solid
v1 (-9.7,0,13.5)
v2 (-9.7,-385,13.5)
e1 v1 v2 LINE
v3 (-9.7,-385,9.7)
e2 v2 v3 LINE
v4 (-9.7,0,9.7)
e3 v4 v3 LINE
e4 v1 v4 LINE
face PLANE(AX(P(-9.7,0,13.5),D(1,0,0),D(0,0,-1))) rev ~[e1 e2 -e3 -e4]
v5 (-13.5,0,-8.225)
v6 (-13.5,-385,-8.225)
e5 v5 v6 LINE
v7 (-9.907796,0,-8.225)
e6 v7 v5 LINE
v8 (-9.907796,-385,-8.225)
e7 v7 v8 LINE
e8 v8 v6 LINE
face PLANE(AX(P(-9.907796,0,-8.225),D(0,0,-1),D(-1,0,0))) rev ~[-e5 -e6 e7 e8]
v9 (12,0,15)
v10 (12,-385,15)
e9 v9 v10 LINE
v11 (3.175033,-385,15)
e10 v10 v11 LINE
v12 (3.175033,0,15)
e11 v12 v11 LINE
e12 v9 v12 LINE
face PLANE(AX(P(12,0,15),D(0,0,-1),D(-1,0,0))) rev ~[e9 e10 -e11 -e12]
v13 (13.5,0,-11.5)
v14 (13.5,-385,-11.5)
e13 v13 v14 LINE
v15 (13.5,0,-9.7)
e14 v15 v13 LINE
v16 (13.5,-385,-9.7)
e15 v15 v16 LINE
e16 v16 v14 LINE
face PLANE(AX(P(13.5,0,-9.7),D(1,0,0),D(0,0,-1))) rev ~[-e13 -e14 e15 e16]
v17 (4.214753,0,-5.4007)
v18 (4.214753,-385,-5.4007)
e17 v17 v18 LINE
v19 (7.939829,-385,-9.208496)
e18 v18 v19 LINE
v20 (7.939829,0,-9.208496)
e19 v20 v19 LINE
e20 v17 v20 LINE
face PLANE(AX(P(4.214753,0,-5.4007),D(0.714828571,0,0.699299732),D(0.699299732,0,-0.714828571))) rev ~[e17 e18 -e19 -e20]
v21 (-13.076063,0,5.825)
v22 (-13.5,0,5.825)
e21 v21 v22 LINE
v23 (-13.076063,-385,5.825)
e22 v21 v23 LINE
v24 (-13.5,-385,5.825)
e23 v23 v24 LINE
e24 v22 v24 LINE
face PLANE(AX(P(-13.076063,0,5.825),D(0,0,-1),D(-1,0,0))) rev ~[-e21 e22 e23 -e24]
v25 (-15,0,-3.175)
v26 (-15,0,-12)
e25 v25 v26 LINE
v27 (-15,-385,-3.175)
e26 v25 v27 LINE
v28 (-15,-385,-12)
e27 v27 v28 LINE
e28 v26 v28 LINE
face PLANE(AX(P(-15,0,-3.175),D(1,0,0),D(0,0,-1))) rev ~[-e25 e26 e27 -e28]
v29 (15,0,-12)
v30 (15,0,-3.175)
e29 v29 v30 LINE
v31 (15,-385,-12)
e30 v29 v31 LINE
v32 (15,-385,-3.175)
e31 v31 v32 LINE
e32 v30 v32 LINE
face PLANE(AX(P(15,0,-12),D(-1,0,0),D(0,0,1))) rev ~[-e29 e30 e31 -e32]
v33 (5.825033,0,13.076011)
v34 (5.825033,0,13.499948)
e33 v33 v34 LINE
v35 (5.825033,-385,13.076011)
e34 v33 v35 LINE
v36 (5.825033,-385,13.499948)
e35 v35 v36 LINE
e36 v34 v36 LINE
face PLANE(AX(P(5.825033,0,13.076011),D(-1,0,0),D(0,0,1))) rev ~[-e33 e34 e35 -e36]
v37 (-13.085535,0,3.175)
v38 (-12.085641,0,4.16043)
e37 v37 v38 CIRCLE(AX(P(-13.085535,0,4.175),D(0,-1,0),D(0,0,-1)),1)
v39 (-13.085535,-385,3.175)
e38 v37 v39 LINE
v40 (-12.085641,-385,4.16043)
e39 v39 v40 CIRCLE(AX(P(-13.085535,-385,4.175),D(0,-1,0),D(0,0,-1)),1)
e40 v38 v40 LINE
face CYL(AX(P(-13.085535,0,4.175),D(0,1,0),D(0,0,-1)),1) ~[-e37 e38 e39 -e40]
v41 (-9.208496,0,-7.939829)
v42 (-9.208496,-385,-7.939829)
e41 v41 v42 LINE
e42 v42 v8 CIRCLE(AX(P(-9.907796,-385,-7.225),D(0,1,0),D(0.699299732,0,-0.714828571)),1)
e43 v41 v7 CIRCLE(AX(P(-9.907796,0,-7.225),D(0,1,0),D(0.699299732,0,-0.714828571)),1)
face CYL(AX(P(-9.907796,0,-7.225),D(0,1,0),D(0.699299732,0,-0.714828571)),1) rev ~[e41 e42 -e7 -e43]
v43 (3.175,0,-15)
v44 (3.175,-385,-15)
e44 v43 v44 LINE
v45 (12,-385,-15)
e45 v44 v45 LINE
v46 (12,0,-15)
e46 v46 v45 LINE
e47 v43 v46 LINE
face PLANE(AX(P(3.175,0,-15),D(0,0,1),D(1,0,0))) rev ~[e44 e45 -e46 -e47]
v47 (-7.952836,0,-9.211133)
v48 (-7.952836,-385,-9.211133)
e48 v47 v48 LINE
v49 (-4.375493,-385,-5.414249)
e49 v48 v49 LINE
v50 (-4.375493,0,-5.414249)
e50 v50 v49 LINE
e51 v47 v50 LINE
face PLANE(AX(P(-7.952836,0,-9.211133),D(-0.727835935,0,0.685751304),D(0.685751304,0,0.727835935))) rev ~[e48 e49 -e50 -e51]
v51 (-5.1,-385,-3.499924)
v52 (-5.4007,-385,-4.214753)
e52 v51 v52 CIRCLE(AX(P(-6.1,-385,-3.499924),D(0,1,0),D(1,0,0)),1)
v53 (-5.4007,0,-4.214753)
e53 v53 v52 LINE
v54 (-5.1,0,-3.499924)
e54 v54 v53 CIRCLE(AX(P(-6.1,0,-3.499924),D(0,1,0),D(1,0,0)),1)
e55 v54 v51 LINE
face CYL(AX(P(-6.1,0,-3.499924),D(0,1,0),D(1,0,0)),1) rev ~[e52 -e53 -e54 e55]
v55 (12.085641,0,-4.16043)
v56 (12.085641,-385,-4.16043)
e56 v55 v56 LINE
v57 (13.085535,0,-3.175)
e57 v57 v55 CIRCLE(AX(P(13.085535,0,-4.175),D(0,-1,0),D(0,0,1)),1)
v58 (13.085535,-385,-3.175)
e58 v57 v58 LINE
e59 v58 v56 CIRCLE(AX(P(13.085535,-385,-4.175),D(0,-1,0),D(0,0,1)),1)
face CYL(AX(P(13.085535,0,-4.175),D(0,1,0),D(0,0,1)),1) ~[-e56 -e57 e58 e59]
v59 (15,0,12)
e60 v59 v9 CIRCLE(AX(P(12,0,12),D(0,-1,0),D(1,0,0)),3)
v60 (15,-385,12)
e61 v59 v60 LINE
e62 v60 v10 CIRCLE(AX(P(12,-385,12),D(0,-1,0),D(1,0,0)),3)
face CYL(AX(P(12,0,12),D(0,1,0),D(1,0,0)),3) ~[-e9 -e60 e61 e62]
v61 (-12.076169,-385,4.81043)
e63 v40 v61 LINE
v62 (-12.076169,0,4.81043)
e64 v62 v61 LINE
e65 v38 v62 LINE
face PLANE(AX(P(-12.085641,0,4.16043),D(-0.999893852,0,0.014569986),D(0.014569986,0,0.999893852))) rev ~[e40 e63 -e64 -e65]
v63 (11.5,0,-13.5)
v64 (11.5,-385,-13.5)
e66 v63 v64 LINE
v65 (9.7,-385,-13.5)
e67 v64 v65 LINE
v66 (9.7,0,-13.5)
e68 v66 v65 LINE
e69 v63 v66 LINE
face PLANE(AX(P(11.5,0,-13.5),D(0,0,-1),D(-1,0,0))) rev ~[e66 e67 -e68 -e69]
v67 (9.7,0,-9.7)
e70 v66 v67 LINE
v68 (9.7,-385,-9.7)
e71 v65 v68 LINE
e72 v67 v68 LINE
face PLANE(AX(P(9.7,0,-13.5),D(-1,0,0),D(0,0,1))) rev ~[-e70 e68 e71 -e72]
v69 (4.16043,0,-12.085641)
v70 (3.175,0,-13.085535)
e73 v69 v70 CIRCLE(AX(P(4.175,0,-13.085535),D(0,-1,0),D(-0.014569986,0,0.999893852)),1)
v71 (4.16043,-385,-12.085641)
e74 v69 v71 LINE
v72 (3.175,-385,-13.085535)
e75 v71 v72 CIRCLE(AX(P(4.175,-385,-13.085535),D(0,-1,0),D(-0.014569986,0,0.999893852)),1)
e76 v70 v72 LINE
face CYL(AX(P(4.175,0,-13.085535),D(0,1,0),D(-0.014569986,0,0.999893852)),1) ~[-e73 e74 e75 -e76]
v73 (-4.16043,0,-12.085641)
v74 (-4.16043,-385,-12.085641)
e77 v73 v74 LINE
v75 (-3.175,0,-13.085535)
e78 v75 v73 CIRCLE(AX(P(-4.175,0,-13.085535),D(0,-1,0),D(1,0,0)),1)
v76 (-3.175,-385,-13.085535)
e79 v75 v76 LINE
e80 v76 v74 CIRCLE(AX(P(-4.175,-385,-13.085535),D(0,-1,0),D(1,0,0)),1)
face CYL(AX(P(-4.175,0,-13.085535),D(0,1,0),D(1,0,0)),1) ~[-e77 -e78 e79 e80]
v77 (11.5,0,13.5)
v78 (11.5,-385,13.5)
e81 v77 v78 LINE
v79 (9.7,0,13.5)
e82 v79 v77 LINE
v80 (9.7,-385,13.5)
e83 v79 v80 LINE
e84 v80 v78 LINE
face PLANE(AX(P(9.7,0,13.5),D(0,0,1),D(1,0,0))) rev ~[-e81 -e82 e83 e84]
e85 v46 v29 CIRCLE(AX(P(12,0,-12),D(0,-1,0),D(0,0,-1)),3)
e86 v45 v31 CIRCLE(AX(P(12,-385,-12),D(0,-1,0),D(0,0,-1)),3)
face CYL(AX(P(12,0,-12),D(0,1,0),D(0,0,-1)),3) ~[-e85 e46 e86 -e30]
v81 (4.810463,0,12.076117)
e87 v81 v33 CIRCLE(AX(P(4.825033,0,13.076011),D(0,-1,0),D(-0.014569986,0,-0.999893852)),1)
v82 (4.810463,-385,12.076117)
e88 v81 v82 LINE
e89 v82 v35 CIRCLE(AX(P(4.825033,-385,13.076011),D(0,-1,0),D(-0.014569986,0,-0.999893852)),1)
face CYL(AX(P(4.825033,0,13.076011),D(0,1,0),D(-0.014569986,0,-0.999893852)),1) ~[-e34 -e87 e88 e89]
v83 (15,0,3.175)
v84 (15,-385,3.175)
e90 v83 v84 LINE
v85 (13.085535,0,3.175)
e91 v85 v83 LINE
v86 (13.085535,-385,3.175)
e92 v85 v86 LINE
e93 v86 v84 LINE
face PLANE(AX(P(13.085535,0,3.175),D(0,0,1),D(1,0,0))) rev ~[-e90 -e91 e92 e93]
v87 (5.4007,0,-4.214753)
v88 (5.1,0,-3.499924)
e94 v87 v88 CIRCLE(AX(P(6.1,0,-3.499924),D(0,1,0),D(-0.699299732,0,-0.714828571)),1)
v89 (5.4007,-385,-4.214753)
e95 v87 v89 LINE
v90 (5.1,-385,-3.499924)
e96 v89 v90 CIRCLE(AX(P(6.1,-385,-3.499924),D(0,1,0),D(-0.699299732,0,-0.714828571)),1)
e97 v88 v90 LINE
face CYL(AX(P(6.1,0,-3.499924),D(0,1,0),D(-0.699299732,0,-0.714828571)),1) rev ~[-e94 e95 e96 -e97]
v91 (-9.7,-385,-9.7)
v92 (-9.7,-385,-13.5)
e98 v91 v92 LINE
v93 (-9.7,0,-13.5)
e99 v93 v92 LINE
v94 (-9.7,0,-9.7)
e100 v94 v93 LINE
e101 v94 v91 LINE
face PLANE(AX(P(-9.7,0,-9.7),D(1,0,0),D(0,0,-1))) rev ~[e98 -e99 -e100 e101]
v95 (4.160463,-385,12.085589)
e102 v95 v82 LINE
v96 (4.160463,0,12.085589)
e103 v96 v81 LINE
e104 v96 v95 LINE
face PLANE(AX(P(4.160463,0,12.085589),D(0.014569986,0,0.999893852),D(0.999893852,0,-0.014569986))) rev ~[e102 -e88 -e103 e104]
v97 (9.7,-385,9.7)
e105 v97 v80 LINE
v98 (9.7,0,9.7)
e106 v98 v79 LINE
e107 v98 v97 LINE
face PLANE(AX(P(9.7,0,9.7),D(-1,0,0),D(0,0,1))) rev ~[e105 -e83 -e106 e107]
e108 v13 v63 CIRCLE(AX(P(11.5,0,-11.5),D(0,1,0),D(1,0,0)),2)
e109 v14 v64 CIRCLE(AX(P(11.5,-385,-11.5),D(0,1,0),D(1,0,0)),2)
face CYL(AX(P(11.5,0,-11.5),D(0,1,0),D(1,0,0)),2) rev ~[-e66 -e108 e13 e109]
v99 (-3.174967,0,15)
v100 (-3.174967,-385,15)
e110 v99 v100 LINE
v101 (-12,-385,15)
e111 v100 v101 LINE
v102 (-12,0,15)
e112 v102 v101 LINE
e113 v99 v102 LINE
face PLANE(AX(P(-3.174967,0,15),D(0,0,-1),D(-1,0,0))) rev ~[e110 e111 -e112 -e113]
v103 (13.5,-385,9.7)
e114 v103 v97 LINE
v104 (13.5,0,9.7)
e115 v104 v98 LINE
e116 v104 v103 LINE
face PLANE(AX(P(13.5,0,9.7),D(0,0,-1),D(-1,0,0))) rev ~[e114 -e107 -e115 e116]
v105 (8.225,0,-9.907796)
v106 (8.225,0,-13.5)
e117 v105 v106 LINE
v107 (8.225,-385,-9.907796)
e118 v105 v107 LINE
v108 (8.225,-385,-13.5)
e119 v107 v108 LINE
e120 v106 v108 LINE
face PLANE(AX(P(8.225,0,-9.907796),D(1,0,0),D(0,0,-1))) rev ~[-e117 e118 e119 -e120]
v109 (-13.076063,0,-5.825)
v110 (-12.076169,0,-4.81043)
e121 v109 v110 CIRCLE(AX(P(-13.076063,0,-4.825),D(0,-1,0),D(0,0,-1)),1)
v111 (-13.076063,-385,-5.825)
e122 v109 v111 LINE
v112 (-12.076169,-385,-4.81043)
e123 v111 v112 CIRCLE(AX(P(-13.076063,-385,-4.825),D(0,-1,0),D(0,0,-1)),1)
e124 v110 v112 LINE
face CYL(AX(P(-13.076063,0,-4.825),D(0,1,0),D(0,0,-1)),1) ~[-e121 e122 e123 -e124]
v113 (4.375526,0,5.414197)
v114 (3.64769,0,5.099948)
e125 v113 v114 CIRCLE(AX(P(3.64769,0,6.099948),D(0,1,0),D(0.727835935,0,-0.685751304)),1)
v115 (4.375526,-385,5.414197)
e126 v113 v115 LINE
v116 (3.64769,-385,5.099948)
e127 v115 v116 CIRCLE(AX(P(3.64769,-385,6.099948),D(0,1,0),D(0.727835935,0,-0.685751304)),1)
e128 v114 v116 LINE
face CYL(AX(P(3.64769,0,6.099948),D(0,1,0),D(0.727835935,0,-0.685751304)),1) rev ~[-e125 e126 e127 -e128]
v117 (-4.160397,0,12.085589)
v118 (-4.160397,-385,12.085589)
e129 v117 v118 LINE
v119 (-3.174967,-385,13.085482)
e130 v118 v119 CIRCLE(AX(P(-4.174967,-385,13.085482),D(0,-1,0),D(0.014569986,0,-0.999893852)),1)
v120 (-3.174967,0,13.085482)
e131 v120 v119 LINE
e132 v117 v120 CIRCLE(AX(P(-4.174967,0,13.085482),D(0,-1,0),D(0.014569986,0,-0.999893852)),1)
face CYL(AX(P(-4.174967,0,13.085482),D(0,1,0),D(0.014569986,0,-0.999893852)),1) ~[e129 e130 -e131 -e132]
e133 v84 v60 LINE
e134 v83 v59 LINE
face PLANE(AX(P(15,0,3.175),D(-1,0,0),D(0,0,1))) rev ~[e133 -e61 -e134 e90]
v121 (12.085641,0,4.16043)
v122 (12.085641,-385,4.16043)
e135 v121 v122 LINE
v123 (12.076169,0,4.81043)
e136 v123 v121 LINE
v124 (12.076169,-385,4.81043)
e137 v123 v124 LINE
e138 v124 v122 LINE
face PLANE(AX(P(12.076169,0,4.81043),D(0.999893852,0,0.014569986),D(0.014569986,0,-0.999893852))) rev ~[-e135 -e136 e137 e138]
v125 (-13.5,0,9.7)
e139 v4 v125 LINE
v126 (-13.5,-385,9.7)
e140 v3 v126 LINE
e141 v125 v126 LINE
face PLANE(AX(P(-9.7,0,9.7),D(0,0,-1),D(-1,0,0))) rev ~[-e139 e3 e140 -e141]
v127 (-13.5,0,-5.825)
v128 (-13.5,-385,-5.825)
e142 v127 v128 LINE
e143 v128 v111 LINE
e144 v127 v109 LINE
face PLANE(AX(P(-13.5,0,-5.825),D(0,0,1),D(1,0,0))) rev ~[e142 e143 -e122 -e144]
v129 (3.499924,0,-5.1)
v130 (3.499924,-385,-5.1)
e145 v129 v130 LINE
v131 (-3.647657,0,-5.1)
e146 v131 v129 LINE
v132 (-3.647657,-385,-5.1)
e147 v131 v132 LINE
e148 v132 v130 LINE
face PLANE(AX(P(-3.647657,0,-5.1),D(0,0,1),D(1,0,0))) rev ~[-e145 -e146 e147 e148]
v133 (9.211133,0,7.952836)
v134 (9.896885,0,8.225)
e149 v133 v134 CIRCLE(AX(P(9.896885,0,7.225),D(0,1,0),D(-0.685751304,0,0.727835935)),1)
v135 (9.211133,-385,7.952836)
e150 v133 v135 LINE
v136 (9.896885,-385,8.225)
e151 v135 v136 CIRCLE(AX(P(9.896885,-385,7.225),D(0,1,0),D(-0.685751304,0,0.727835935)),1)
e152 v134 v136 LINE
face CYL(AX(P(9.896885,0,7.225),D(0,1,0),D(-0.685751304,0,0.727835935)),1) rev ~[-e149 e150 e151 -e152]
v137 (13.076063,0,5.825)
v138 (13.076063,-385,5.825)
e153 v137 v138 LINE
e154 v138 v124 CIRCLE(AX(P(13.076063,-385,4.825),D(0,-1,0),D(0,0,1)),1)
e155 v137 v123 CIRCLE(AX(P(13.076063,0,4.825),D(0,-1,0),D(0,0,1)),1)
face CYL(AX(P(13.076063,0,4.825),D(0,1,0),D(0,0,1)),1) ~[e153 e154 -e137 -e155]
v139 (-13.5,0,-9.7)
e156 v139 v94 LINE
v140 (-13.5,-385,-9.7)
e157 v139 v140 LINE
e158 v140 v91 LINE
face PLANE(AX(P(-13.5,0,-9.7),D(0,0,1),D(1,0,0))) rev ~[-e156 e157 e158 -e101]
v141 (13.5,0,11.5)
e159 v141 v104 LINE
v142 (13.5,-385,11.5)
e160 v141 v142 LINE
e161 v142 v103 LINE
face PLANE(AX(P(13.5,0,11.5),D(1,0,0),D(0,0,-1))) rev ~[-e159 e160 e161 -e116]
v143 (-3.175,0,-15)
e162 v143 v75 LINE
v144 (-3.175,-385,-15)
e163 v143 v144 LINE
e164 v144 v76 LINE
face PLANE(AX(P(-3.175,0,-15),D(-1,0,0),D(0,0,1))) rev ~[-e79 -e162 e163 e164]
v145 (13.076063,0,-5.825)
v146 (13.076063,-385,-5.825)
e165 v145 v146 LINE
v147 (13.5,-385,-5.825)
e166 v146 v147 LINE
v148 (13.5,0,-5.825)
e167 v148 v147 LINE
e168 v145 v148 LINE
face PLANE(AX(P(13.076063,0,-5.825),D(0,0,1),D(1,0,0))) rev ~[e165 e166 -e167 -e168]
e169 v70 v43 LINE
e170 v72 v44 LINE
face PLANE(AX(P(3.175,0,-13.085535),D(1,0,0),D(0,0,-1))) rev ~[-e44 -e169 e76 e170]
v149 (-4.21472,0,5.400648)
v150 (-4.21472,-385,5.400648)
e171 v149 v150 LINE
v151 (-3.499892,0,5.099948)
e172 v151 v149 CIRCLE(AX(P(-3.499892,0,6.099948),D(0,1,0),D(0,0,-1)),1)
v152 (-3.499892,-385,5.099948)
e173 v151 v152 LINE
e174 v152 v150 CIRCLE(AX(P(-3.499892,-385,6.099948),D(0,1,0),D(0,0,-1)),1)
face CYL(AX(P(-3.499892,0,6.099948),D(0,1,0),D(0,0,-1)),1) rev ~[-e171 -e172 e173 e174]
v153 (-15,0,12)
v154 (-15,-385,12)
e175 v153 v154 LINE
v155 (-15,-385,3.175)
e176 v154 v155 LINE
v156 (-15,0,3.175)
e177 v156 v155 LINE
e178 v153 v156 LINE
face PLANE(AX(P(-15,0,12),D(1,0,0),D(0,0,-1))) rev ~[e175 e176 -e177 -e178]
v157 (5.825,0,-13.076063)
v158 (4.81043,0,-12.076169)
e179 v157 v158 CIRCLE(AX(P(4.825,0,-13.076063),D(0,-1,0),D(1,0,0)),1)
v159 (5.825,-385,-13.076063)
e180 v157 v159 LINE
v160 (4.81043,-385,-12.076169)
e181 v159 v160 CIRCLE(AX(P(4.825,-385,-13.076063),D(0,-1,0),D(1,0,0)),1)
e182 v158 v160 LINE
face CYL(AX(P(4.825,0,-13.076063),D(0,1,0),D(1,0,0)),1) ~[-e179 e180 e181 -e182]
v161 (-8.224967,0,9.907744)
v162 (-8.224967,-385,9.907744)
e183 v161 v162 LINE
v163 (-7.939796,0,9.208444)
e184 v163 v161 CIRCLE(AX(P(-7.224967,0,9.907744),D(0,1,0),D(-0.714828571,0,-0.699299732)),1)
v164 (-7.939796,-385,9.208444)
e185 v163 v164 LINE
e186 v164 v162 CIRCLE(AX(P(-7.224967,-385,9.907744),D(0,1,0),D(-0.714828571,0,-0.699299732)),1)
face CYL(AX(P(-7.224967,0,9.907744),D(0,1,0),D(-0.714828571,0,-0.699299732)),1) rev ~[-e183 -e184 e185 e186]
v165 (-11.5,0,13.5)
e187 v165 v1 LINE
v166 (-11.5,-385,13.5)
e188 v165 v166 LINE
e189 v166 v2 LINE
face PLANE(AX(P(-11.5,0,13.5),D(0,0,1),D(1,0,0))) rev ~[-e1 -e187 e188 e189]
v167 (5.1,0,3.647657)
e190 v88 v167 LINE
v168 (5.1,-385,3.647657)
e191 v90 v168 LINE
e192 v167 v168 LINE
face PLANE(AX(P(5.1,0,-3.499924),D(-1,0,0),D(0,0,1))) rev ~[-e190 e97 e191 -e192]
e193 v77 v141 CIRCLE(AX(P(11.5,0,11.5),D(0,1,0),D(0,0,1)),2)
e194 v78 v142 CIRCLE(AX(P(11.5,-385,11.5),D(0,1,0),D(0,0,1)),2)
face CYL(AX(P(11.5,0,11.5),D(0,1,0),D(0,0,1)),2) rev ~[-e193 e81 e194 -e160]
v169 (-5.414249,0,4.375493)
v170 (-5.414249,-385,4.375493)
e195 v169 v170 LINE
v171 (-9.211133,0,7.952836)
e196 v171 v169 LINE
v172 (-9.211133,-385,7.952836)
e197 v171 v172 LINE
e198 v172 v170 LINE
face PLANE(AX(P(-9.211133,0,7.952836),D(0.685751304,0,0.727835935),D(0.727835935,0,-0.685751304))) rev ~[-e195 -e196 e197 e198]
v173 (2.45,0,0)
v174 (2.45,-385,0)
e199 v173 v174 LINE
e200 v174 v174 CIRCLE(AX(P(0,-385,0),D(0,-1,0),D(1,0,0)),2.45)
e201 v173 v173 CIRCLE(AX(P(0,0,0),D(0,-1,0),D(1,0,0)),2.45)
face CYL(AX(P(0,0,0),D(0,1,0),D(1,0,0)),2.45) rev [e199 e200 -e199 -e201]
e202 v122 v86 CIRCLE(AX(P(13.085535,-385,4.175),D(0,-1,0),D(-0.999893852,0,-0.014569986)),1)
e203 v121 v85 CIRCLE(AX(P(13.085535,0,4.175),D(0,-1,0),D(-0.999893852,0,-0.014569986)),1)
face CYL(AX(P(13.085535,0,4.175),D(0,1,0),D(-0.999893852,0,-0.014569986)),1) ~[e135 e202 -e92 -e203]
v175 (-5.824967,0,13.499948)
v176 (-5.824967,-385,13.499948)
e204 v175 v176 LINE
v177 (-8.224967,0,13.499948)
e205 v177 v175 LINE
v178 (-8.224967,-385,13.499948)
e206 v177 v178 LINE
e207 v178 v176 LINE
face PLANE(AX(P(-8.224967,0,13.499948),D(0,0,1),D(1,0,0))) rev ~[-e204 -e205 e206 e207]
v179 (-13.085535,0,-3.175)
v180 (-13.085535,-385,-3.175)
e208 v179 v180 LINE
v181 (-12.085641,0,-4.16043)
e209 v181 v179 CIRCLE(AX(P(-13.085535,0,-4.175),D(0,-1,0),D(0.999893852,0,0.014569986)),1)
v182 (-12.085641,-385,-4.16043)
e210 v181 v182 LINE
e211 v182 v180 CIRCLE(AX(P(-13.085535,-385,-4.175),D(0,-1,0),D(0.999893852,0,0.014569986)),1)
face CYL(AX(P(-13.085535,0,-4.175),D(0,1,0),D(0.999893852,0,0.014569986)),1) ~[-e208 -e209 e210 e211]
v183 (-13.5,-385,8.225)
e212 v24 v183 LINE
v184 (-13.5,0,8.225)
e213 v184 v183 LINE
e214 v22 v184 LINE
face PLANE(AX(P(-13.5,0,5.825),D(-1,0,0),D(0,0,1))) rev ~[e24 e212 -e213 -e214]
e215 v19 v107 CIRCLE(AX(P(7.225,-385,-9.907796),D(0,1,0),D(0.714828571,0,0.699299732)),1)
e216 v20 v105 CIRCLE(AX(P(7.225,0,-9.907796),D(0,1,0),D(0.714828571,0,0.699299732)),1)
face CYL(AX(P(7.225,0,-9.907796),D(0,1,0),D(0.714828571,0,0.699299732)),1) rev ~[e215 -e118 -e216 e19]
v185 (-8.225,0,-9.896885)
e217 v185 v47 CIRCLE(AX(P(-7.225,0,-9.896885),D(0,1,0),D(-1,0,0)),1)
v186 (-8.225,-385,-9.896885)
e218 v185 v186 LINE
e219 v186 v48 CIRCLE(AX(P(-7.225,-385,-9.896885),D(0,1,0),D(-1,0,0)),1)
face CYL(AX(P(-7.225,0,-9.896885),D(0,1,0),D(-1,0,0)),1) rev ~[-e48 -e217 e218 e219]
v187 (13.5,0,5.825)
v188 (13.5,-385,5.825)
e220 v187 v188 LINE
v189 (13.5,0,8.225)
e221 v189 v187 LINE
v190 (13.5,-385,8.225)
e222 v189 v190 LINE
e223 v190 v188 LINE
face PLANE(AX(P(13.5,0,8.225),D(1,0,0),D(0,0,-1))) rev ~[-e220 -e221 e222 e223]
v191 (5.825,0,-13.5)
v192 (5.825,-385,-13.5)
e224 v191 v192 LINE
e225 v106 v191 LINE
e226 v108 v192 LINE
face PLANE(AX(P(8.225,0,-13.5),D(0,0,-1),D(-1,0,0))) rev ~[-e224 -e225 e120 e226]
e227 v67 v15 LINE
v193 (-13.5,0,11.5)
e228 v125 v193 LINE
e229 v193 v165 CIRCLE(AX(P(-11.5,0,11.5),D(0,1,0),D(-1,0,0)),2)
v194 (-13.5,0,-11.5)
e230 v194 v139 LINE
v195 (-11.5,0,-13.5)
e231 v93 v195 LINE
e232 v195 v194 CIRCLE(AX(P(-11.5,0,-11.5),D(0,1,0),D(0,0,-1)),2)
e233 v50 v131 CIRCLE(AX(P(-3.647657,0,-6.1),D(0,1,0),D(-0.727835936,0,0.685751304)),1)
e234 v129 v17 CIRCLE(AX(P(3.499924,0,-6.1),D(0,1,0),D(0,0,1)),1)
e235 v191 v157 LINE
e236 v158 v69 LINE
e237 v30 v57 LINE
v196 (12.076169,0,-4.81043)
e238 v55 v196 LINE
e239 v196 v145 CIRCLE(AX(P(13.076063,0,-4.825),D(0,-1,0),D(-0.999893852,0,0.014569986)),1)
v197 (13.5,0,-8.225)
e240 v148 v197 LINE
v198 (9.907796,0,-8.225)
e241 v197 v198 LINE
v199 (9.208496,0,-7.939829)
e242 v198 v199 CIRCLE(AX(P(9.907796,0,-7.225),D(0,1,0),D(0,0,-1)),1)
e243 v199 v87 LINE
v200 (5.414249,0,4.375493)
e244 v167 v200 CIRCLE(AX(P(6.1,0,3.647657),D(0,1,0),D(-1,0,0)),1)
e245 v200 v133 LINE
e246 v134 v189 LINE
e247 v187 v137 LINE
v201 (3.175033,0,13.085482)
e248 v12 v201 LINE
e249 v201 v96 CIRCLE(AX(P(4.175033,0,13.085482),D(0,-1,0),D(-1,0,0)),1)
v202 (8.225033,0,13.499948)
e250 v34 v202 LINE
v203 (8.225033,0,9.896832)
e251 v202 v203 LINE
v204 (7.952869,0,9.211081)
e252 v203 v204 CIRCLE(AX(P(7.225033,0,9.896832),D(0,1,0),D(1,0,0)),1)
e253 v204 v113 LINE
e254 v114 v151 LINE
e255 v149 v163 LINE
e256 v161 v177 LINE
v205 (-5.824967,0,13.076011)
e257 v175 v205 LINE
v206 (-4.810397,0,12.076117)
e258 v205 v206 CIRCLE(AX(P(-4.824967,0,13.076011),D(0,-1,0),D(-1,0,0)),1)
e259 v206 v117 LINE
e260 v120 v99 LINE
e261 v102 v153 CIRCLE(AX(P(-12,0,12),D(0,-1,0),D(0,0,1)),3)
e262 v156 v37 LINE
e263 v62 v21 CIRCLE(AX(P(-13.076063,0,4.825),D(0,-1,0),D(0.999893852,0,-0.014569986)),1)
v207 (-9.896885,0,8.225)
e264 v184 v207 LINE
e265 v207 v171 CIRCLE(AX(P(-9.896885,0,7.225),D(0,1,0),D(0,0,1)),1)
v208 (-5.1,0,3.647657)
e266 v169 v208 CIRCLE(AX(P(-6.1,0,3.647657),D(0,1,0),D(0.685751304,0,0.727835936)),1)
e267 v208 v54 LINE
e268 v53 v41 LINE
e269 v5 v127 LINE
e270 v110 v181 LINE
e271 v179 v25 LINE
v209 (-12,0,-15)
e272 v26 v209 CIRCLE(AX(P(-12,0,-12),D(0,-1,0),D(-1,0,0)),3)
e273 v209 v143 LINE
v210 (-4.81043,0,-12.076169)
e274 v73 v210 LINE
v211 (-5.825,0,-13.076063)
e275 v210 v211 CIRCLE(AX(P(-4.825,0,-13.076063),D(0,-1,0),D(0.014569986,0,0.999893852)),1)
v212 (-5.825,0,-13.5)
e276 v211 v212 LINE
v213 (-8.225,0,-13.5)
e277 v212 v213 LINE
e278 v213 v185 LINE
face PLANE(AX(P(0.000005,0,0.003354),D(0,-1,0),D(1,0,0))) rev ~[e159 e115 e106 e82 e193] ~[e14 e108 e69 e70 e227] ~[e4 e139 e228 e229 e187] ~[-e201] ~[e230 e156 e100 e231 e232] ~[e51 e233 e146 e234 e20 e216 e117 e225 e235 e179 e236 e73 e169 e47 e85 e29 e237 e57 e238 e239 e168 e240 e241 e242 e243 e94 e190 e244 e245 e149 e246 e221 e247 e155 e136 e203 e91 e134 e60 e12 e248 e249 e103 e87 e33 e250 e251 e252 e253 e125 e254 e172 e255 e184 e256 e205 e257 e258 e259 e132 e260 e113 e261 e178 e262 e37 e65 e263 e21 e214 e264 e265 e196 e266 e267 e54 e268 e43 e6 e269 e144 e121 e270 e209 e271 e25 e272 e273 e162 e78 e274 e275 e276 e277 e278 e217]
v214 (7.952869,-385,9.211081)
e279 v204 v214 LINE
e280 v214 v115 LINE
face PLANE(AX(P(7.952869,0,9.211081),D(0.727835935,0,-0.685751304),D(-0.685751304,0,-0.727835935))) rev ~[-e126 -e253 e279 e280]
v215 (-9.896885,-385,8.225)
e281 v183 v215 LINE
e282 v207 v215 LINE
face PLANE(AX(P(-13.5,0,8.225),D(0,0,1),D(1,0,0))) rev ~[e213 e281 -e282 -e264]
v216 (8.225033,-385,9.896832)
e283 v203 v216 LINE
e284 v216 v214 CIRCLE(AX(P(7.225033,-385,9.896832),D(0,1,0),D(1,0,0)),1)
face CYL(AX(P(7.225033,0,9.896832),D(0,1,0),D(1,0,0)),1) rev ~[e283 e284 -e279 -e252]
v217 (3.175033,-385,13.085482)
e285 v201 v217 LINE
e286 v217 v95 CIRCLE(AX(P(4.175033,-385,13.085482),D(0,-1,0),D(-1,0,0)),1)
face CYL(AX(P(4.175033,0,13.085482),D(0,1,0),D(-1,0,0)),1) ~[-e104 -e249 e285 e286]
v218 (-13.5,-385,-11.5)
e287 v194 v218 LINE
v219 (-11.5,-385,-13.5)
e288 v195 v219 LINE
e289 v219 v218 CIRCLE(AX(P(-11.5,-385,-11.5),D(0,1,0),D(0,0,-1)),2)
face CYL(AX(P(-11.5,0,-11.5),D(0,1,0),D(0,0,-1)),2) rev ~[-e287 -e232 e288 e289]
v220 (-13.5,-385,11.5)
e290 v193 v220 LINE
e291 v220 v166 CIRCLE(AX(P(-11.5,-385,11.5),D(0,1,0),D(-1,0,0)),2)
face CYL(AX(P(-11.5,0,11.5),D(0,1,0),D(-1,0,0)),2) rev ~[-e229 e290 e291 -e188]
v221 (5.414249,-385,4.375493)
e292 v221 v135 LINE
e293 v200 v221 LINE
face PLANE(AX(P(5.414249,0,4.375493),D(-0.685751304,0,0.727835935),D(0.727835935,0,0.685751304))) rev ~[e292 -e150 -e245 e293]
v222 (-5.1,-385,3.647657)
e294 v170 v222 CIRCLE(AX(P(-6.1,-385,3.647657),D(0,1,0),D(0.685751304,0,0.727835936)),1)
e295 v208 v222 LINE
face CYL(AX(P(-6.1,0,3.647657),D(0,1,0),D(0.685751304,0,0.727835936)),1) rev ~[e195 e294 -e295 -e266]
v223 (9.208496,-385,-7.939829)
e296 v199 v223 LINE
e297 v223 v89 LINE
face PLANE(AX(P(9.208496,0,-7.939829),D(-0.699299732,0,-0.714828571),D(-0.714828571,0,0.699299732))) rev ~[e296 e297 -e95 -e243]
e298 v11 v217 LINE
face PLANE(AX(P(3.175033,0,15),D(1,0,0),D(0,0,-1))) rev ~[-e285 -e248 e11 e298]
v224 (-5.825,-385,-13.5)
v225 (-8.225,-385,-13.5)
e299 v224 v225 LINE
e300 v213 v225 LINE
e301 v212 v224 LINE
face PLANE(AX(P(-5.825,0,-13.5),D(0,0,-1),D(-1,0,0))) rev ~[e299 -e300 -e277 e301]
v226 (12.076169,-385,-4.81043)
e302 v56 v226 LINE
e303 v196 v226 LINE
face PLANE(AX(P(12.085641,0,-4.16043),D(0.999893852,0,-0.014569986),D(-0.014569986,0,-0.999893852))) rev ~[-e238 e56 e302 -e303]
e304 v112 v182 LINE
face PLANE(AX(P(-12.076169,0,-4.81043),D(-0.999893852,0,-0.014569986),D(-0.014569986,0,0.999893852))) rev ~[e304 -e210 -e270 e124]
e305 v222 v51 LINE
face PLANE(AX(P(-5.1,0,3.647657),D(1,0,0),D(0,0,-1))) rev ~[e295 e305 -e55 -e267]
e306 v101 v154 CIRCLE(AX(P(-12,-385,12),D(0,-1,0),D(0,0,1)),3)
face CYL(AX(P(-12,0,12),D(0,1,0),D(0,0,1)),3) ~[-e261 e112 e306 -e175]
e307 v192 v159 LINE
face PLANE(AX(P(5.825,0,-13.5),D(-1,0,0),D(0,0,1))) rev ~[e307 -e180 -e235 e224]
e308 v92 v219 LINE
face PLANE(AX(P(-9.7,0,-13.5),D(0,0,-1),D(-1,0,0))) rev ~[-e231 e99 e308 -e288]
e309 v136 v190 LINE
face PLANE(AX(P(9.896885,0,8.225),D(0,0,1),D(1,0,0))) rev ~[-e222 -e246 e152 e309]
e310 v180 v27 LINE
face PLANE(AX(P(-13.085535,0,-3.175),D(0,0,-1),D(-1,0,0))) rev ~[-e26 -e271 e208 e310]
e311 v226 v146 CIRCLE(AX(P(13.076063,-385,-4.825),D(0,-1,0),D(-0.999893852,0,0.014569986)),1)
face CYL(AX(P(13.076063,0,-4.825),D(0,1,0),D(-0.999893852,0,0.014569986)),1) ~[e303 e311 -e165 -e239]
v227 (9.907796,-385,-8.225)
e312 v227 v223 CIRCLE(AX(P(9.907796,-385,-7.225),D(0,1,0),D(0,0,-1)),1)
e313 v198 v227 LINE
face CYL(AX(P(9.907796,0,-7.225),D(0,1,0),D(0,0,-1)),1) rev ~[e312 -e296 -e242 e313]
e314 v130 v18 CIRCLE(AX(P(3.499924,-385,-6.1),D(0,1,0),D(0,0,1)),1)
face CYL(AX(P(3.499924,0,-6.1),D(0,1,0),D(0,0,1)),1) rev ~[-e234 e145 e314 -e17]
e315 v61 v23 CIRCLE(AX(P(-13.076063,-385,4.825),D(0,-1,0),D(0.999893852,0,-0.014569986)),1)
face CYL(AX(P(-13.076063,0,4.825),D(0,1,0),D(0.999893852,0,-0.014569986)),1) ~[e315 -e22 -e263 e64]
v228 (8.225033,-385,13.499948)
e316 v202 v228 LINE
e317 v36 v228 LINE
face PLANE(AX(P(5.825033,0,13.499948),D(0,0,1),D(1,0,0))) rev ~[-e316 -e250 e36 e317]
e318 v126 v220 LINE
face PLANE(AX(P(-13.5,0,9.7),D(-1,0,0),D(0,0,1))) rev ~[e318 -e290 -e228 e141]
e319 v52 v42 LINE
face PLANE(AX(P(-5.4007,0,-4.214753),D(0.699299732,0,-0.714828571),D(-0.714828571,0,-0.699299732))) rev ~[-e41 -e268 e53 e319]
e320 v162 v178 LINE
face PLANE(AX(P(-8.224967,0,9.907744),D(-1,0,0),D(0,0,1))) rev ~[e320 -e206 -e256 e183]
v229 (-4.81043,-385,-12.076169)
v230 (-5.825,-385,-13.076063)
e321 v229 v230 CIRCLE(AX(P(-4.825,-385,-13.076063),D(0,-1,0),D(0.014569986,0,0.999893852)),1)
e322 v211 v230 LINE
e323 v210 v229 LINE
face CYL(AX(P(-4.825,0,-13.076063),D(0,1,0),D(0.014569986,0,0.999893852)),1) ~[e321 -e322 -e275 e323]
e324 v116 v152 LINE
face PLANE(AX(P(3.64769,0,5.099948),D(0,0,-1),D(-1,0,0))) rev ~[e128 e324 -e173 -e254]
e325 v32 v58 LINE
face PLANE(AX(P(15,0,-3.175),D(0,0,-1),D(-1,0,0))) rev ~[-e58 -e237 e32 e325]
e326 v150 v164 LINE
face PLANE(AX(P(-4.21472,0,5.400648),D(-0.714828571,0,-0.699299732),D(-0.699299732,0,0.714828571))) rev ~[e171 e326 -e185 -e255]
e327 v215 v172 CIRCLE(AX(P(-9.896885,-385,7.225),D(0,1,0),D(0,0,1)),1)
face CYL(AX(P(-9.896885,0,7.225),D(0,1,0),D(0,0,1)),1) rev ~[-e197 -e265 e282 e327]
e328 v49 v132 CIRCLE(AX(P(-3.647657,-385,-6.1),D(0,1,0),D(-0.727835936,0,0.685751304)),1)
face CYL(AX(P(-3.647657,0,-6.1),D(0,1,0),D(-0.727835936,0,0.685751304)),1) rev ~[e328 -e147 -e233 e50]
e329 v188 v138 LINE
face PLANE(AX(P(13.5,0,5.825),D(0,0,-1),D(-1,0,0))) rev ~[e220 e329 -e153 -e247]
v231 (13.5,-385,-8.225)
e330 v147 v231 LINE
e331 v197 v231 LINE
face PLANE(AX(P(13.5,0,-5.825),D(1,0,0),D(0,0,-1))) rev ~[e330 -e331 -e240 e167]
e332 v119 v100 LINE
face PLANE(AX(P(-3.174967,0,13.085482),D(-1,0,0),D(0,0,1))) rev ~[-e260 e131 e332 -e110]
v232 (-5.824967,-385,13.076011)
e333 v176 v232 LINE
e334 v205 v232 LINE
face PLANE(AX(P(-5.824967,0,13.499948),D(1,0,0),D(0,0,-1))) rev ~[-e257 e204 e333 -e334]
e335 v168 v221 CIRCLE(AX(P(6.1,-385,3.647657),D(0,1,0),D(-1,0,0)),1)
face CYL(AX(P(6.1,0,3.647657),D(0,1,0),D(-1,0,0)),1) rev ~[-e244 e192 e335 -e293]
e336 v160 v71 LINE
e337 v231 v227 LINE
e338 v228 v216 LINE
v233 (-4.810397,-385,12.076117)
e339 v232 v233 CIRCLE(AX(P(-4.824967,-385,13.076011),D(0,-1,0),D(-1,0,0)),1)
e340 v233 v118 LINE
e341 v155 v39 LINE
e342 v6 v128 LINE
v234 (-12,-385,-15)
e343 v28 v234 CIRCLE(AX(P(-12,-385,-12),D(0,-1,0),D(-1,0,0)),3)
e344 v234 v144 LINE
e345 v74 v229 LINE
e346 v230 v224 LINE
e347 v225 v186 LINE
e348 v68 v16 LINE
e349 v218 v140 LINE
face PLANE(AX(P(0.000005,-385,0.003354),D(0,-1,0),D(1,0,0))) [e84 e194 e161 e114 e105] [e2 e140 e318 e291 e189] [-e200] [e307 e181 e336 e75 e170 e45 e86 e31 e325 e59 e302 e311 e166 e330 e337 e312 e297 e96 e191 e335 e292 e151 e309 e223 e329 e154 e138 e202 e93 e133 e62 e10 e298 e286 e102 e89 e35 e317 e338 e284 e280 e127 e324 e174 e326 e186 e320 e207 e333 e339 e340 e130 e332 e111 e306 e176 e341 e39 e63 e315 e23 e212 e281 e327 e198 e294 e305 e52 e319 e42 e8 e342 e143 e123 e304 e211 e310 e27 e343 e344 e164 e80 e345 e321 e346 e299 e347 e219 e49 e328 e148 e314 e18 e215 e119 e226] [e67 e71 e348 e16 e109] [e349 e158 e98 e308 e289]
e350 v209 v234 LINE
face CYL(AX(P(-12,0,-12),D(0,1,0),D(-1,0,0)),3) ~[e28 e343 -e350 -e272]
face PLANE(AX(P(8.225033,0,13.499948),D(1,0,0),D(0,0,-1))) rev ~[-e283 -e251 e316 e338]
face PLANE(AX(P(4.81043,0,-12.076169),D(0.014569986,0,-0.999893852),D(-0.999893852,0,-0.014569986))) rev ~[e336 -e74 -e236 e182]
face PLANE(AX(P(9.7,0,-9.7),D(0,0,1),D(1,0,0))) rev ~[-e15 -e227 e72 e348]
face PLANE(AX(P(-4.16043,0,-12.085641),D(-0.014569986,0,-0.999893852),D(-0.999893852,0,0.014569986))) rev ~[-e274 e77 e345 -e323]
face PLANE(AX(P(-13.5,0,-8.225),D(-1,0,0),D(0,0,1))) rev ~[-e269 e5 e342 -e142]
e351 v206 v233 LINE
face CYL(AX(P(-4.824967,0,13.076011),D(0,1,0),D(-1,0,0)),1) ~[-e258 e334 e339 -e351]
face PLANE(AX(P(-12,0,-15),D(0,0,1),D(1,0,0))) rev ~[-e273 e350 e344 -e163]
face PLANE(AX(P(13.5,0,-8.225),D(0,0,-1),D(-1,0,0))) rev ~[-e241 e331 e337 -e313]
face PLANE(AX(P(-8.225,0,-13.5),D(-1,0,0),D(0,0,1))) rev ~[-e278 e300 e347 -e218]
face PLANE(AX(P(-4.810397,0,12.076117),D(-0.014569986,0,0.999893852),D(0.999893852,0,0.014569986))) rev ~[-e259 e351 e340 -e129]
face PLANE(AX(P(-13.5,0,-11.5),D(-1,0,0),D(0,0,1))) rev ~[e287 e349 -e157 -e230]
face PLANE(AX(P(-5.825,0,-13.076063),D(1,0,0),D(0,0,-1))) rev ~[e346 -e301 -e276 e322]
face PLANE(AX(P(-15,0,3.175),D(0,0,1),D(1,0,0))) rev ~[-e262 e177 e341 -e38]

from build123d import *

# Parameters (mm, degrees)
F0_R     = 2.45
F1_DEPTH = 460
F2_DEPTH = 75


# Not quite as in the source:
# - ends of sketch curves that miss each other by under 0.0002 mm in the source are joined


with BuildPart() as f1:
    # F0 (on Front) → F1 (new body)
    with BuildSketch(Plane.XZ):
        with BuildLine():
            Line((-3.1749674082, 15), (-12, 15))
            ThreePointArc((-12, 15), (-14.1213203436, 14.1213203436), (-15, 12))
            Line((-15, 12), (-15, 3.175))
            Line((-15, 3.175), (-13.0855346263, 3.175))
            ThreePointArc((-13.0855346263, 3.175), (-12.3835980145, 3.4627605788), (-12.0856407741, 4.1604300138))
            Line((-12.0856407741, 4.1604300138), (-12.0761692778, 4.8104300138))
            ThreePointArc((-12.0761692778, 4.8104300138), (-12.3638237087, 5.5269366118), (-13.0760631299, 5.825))
            Line((-13.0760631299, 5.825), (-13.5, 5.825))
            Line((-13.5, 5.825), (-13.5, 8.225))
            Line((-13.5, 8.225), (-9.8968845016, 8.225))
            ThreePointArc((-9.8968845016, 8.225), (-9.5279915195, 8.1544718757), (-9.2111331975, 7.9528359354))
            Line((-9.2111331975, 7.9528359354), (-5.4142486959, 4.3754933338))
            ThreePointArc((-5.4142486959, 4.3754933338), (-5.1819174045, 4.0440465354), (-5.1, 3.6476573984))
            Line((-5.1, 3.6476573984), (-5.1, -3.4999243287))
            ThreePointArc((-5.1, -3.4999243287), (-5.1782354607, -3.8876744211), (-5.4007002683, -4.2147528992))
            Line((-5.4007002683, -4.2147528992), (-9.2084959767, -7.9398285705))
            ThreePointArc((-9.2084959767, -7.9398285705), (-9.5301904718, -8.1509666761), (-9.9077957084, -8.225))
            Line((-9.9077957084, -8.225), (-13.5, -8.225))
            Line((-13.5, -8.225), (-13.5, -5.825))
            Line((-13.5, -5.825), (-13.0760631299, -5.825))
            ThreePointArc((-13.0760631299, -5.825), (-12.3638237087, -5.5269366118), (-12.0761692778, -4.8104300138))
            Line((-12.0761692778, -4.8104300138), (-12.0856407741, -4.1604300138))
            ThreePointArc((-12.0856407741, -4.1604300138), (-12.3835980145, -3.4627605788), (-13.0855346263, -3.175))
            Line((-13.0855346263, -3.175), (-15, -3.175))
            Line((-15, -3.175), (-15, -12))
            ThreePointArc((-15, -12), (-14.1213203436, -14.1213203436), (-12, -15))
            Line((-12, -15), (-3.175, -15))
            Line((-3.175, -15), (-3.175, -13.0855346263))
            ThreePointArc((-3.175, -13.0855346263), (-3.4627605788, -12.3835980145), (-4.1604300138, -12.0856407741))
            Line((-4.1604300138, -12.0856407741), (-4.8104300138, -12.0761692778))
            ThreePointArc((-4.8104300138, -12.0761692778), (-5.5269366118, -12.3638237087), (-5.825, -13.0760631299))
            Line((-5.825, -13.0760631299), (-5.825, -13.5))
            Line((-5.825, -13.5), (-8.225, -13.5))
            Line((-8.225, -13.5), (-8.225, -9.8968845016))
            ThreePointArc((-8.225, -9.8968845016), (-8.1544718757, -9.5279915195), (-7.9528359354, -9.2111331975))
            Line((-7.9528359354, -9.2111331975), (-4.3754933338, -5.4142486959))
            ThreePointArc((-4.3754933338, -5.4142486959), (-4.0440465354, -5.1819174045), (-3.6476573984, -5.1))
            Line((-3.6476573984, -5.1), (3.4999243287, -5.1))
            ThreePointArc((3.4999243287, -5.1), (3.8876744211, -5.1782354607), (4.2147528992, -5.4007002683))
            Line((4.2147528992, -5.4007002683), (7.9398285705, -9.2084959767))
            ThreePointArc((7.9398285705, -9.2084959767), (8.1509666761, -9.5301904718), (8.225, -9.9077957084))
            Line((8.225, -9.9077957084), (8.225, -13.5))
            Line((8.225, -13.5), (5.825, -13.5))
            Line((5.825, -13.5), (5.825, -13.0760631299))
            ThreePointArc((5.825, -13.0760631299), (5.5269366118, -12.3638237087), (4.8104300138, -12.0761692778))
            Line((4.8104300138, -12.0761692778), (4.1604300138, -12.0856407741))
            ThreePointArc((4.1604300138, -12.0856407741), (3.4627605788, -12.3835980145), (3.175, -13.0855346263))
            Line((3.175, -13.0855346263), (3.175, -15))
            Line((3.175, -15), (12, -15))
            ThreePointArc((12, -15), (14.1213203436, -14.1213203436), (15, -12))
            Line((15, -12), (15, -3.175))
            Line((15, -3.175), (13.0855346263, -3.175))
            ThreePointArc((13.0855346263, -3.175), (12.3835980145, -3.4627605788), (12.0856407741, -4.1604300138))
            Line((12.0856407741, -4.1604300138), (12.0761692778, -4.8104300138))
            ThreePointArc((12.0761692778, -4.8104300138), (12.3638237087, -5.5269366118), (13.0760631299, -5.825))
            Line((13.0760631299, -5.825), (13.5, -5.825))
            Line((13.5, -5.825), (13.5, -8.225))
            Line((13.5, -8.225), (9.9077957084, -8.225))
            ThreePointArc((9.9077957084, -8.225), (9.5301904718, -8.1509666761), (9.2084959767, -7.9398285705))
            Line((9.2084959767, -7.9398285705), (5.4007002683, -4.2147528992))
            ThreePointArc((5.4007002683, -4.2147528992), (5.1782354607, -3.8876744211), (5.1, -3.4999243287))
            Line((5.1, -3.4999243287), (5.1, 3.6476573984))
            ThreePointArc((5.1, 3.6476573984), (5.1819174045, 4.0440465354), (5.4142486959, 4.3754933338))
            Line((5.4142486959, 4.3754933338), (9.2111331975, 7.9528359354))
            ThreePointArc((9.2111331975, 7.9528359354), (9.5279915195, 8.1544718757), (9.8968845016, 8.225))
            Line((9.8968845016, 8.225), (13.5, 8.225))
            Line((13.5, 8.225), (13.5, 5.825))
            Line((13.5, 5.825), (13.0760631299, 5.825))
            ThreePointArc((13.0760631299, 5.825), (12.3638237087, 5.5269366118), (12.0761692778, 4.8104300138))
            Line((12.0761692778, 4.8104300138), (12.0856407741, 4.1604300138))
            ThreePointArc((12.0856407741, 4.1604300138), (12.3835980145, 3.4627605788), (13.0855346263, 3.175))
            Line((13.0855346263, 3.175), (15, 3.175))
            Line((15, 3.175), (15, 12))
            ThreePointArc((15, 12), (14.1213203436, 14.1213203436), (12, 15))
            Line((12, 15), (3.1750325918, 15))
            Line((3.1750325918, 15), (3.1750325918, 13.0854824722))
            ThreePointArc((3.1750325918, 13.0854824722), (3.4627931706, 12.3835458604), (4.1604626057, 12.0855886201))
            Line((4.1604626057, 12.0855886201), (4.8104626057, 12.0761171237))
            ThreePointArc((4.8104626057, 12.0761171237), (5.5269692036, 12.3637715546), (5.8250325918, 13.0760109758))
            Line((5.8250325918, 13.0760109758), (5.8250325918, 13.4999478459))
            Line((5.8250325918, 13.4999478459), (8.2250325918, 13.4999478459))
            Line((8.2250325918, 13.4999478459), (8.2250325918, 9.8968323476))
            ThreePointArc((8.2250325918, 9.8968323476), (8.1545044675, 9.5279393654), (7.9528685272, 9.2110810434))
            Line((7.9528685272, 9.2110810434), (4.3755259256, 5.4141965418))
            ThreePointArc((4.3755259256, 5.4141965418), (4.0440791272, 5.1818652505), (3.6476899902, 5.0999478459))
            Line((3.6476899902, 5.0999478459), (-3.4998917369, 5.0999478459))
            ThreePointArc((-3.4998917369, 5.0999478459), (-3.8876418293, 5.1781833067), (-4.2147203074, 5.4006481142))
            Line((-4.2147203074, 5.4006481142), (-7.9397959787, 9.2084438226))
            ThreePointArc((-7.9397959787, 9.2084438226), (-8.1509340843, 9.5301383177), (-8.2249674082, 9.9077435543))
            Line((-8.2249674082, 9.9077435543), (-8.2249674082, 13.4999478459))
            Line((-8.2249674082, 13.4999478459), (-5.8249674082, 13.4999478459))
            Line((-5.8249674082, 13.4999478459), (-5.8249674082, 13.0760109758))
            ThreePointArc((-5.8249674082, 13.0760109758), (-5.5269040199, 12.3637715546), (-4.810397422, 12.0761171237))
            Line((-4.810397422, 12.0761171237), (-4.160397422, 12.0855886201))
            ThreePointArc((-4.160397422, 12.0855886201), (-3.462727987, 12.3835458604), (-3.1749674082, 13.0854824722))
            Line((-3.1749674082, 13.0854824722), (-3.1749674082, 15))
        make_face()
        with BuildLine():
            Line((-13.5, -11.5), (-13.5, -9.7))
            Line((-13.5, -9.7), (-9.7, -9.7))
            Line((-9.7, -9.7), (-9.7, -13.5))
            Line((-9.7, -13.5), (-11.5, -13.5))
            ThreePointArc((-11.5, -13.5), (-12.9142135624, -12.9142135624), (-13.5, -11.5))
        make_face(mode=Mode.SUBTRACT)
        with BuildLine():
            Line((9.7, -9.7), (13.5, -9.7))
            Line((13.5, -9.7), (13.5, -11.5))
            ThreePointArc((13.5, -11.5), (12.9142135624, -12.9142135624), (11.5, -13.5))
            Line((11.5, -13.5), (9.7, -13.5))
            Line((9.7, -13.5), (9.7, -9.7))
        make_face(mode=Mode.SUBTRACT)
        with BuildLine():
            ThreePointArc((-13.5, 11.5), (-12.9142135624, 12.9142135624), (-11.5, 13.5))
            Line((-11.5, 13.5), (-9.7, 13.5))
            Line((-9.7, 13.5), (-9.7, 9.7))
            Line((-9.7, 9.7), (-13.5, 9.7))
            Line((-13.5, 9.7), (-13.5, 11.5))
        make_face(mode=Mode.SUBTRACT)
        Circle(F0_R, mode=Mode.SUBTRACT)
        with BuildLine():
            Line((9.7, 13.5), (11.5, 13.5))
            ThreePointArc((11.5, 13.5), (12.9142135624, 12.9142135624), (13.5, 11.5))
            Line((13.5, 11.5), (13.5, 9.7))
            Line((13.5, 9.7), (9.7, 9.7))
            Line((9.7, 9.7), (9.7, 13.5))
        make_face(mode=Mode.SUBTRACT)
    extrude(amount=F1_DEPTH)

    # F2 (cut): a face of the model
    f2_faces = [f1.faces().sort_by_distance(p)[0] for p in [
        (5.2291627207, -460, 12.6659491494),
    ]]
    extrude(f2_faces, amount=-F2_DEPTH, mode=Mode.SUBTRACT)


solid = f1.part
